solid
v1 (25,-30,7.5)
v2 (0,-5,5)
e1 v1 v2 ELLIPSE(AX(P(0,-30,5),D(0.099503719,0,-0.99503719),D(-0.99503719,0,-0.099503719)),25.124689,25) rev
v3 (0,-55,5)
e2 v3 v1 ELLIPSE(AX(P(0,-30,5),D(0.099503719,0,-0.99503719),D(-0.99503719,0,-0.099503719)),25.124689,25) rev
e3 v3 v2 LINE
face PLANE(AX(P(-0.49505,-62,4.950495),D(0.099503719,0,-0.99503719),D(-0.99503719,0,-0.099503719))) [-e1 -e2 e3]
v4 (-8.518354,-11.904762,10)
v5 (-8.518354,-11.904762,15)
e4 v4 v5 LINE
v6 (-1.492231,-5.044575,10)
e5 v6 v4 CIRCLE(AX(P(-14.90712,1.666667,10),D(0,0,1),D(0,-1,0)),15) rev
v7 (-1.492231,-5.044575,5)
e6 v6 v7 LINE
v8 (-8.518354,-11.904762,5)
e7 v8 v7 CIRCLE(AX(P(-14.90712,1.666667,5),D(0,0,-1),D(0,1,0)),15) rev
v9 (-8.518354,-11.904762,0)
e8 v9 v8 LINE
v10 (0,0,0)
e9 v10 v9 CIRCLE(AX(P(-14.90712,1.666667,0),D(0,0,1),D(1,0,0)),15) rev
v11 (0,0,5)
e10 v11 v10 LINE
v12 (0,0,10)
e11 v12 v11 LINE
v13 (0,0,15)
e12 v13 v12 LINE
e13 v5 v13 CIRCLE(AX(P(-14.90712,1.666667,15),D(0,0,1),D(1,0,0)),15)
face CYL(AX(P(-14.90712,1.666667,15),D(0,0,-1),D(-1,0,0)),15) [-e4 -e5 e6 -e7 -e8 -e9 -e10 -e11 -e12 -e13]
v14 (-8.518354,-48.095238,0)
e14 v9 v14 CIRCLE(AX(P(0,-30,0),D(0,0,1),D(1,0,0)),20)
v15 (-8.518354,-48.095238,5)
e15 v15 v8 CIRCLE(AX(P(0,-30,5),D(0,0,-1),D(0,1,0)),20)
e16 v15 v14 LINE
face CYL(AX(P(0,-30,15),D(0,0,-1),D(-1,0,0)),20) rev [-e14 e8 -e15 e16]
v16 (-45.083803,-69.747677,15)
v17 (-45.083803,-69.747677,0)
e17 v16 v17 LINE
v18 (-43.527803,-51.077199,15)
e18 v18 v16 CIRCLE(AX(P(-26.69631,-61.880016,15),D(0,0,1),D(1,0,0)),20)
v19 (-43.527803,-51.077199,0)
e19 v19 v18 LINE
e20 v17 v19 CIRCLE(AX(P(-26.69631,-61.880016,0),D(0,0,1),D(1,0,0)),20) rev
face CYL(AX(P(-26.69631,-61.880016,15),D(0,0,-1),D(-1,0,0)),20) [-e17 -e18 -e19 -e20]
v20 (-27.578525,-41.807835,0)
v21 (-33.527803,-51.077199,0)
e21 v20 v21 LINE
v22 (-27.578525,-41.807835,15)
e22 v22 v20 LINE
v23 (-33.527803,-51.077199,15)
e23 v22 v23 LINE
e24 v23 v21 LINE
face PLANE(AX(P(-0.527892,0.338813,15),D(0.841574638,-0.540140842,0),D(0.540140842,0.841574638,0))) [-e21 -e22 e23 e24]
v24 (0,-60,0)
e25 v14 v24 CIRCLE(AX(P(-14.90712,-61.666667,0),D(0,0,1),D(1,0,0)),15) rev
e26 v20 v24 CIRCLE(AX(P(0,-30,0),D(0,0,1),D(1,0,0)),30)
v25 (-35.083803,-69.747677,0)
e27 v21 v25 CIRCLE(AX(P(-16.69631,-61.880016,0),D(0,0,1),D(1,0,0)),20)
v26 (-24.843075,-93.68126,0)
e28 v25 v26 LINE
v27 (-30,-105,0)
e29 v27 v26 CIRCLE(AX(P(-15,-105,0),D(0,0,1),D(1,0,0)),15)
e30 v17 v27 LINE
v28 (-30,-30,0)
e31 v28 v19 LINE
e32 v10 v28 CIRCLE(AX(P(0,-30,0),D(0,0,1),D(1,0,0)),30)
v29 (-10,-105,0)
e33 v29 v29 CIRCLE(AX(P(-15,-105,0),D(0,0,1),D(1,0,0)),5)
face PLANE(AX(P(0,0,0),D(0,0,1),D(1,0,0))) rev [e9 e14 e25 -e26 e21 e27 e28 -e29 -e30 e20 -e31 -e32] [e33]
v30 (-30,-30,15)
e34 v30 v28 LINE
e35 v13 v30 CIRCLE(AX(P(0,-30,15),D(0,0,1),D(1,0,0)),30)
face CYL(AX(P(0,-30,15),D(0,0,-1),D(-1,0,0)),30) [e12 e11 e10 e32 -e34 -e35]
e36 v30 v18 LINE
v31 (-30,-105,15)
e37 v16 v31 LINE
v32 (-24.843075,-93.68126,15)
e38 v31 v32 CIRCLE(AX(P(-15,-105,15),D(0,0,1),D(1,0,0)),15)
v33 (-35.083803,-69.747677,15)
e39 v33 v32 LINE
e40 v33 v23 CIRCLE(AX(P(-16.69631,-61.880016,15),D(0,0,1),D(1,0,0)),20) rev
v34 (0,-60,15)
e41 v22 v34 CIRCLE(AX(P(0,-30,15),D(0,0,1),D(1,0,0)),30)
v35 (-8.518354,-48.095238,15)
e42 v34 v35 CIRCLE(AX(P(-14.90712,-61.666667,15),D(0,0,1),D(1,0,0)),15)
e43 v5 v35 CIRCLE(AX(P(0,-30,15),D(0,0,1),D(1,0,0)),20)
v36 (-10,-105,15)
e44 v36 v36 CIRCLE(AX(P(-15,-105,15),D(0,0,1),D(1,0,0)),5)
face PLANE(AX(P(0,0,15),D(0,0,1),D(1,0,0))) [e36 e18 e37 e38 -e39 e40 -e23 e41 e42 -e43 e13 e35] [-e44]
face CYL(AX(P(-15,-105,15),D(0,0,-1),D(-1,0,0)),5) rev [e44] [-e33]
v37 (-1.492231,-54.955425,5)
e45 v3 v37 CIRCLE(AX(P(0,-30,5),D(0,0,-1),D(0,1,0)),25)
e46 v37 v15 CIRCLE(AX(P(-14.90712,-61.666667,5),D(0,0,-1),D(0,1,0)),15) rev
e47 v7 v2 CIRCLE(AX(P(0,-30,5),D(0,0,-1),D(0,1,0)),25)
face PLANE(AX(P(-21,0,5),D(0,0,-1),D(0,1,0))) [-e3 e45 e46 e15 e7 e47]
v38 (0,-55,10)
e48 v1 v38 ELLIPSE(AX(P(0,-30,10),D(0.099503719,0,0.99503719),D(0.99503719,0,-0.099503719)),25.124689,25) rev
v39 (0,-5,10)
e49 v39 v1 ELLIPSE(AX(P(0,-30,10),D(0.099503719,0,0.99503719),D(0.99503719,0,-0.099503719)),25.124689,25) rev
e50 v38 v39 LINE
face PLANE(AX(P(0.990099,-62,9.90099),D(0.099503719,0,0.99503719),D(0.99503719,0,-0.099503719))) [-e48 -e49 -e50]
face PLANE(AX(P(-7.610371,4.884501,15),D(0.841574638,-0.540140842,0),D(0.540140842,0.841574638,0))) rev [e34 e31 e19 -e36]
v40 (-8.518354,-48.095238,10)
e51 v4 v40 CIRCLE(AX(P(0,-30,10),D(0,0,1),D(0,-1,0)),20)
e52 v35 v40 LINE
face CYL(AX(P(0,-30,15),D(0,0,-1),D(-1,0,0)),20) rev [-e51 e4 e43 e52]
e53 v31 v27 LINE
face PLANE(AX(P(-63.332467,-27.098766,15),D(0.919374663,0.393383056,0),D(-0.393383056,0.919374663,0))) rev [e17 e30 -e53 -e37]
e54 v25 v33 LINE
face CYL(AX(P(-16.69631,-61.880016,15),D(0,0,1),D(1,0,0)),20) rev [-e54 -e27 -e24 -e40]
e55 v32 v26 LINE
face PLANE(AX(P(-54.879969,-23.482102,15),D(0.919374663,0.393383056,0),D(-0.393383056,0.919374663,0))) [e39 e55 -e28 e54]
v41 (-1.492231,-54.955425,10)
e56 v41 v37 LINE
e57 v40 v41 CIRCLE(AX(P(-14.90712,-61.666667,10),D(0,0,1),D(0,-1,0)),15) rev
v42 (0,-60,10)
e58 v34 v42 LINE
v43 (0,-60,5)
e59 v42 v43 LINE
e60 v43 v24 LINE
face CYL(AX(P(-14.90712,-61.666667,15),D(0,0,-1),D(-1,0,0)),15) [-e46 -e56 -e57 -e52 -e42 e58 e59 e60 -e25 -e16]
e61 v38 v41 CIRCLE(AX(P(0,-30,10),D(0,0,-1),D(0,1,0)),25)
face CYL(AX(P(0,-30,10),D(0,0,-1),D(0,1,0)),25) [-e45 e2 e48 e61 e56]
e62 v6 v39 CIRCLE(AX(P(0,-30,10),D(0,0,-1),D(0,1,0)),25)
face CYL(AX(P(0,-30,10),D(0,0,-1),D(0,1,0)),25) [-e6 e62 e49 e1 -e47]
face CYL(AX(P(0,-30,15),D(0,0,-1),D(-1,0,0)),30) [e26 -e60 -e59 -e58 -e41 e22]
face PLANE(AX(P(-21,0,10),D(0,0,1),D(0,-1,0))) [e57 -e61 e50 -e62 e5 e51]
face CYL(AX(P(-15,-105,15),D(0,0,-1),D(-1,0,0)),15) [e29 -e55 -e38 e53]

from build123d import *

# Parameters (mm, degrees)
BOSS_EXTRUDE1_DEPTH      = 15
FILLET1_R                = 20
FILLET2_R                = 15
BOSS_EXTRUDE2_DEPTH      = 25
BOSS_EXTRUDE2_DEPTH_BACK = 21
SKETCH2_W                = 5
SKETCH2_H                = 60
CUT_EXTRUDE1_DEPTH       = 5
CUT_EXTRUDE2_DEPTH       = 62


with BuildPart() as part:
    # Sketch1 → Boss-Extrude1 (new body)
    # profile 1 of 6: a face of its own
    with BuildSketch(Plane.XY):
        with BuildLine():
            Line((-20, -30), (-30, -30))
            ThreePointArc((-30, -30), (-29.388396861, -36.026784376), (-27.578524672, -41.807835403))
            Line((-27.578524672, -41.807835403), (-20, -30))
        make_face()
    # profile 2 of 6: a face of its own
    with BuildSketch(Plane.XY):
        with BuildLine():
            Line((0, -10), (0, 0))
            ThreePointArc((0, 0), (-21.213203436, -8.786796564), (-30, -30))
            Line((-30, -30), (-20, -30))
            ThreePointArc((-20, -30), (-14.142135624, -15.857864376), (0, -10))
        make_face()
    # profile 3 of 6: a face of its own
    with BuildSketch(Plane.XY):
        with BuildLine():
            ThreePointArc((0, -50), (-14.142135624, -44.142135624), (-20, -30))
            Line((-20, -30), (-27.578524672, -41.807835403))
            ThreePointArc((-27.578524672, -41.807835403), (-16.519154608, -55.04231481), (0, -60))
            Line((0, -60), (0, -50))
        make_face()
    # profile 4 of 6: a face of its own
    with BuildSketch(Plane.XY):
        with BuildLine():
            ThreePointArc((-27.578524672, -41.807835403), (-29.388396861, -36.026784376), (-30, -30))
            Line((-30, -30), (-49.254650189, -60))
            Line((-49.254650189, -60), (-30, -105))
            ThreePointArc((-30, -105), (-28.650020621, -98.780921528), (-24.84307506, -93.681260081))
            Line((-24.84307506, -93.681260081), (-39.254650189, -60))
            Line((-39.254650189, -60), (-27.578524672, -41.807835403))
        make_face()
    # profile 5 of 6: a face of its own
    with BuildSketch(Plane.XY):
        with BuildLine():
            ThreePointArc((-24.84307506, -93.681260081), (-28.650020621, -98.780921528), (-30, -105))
            Line((-30, -105), (-20, -105))
            Line((-20, -105), (-24.84307506, -93.681260081))
        make_face()
    # profile 6 of 6: a face of its own
    with BuildSketch(Plane.XY):
        with BuildLine():
            Line((-20, -105), (-30, -105))
            ThreePointArc((-30, -105), (-15, -120), (0, -105))
            ThreePointArc((0, -105), (-8.780921528, -91.349979379), (-24.84307506, -93.681260081))
            Line((-24.84307506, -93.681260081), (-20, -105))
        make_face()
        with BuildLine():
            ThreePointArc((-10, -105), (-15, -110), (-20, -105))
            ThreePointArc((-20, -105), (-15, -100), (-10, -105))
        make_face(mode=Mode.SUBTRACT)
    extrude(amount=BOSS_EXTRUDE1_DEPTH)

    # Fillet1
    fillet1_edges = [part.edges().sort_by_distance(p)[0] for p in [
        (-39.254650189, -60, 7.5),
        (-49.254650189, -60, 7.5),
    ]]
    fillet(fillet1_edges, radius=FILLET1_R)

    # Fillet2
    # the kernel refuses this fillet: 15 mm, written as the material it takes off along each edge
    with BuildSketch(Plane(origin=(0, -50, -25), x_dir=(-0.9759000729485309, 0.21821789023600283, 0), z_dir=(0, 0, 1))) as fillet2_piece_1:
        with BuildLine():
            CenterArc((12.001983963, 14.638501094), FILLET2_R, 198.983752857, 58.411864495)
            Line((-2.182178902, 9.759000729), (-2.46586216, 9.661410722))
            ThreePointArc((-2.46586216, 9.661410722), (-1.383859473, 4.814034998), (-0.292770022, -0.065465367))
            Line((-0.292770022, -0.065465367), (0.065465367, -0.292770022))
            ThreePointArc((0.065465367, -0.292770022), (4.364357805, 0.181998541), (8.663250242, -0.292770022))
            Line((8.663250242, -0.292770022), (8.728715609, 0))
        make_face()
    extrude(amount=65, mode=Mode.SUBTRACT)
    with BuildSketch(Plane(origin=(0, -10, -25), x_dir=(0, 1, 0), z_dir=(0, 0, 1))) as fillet2_piece_2:
        with BuildLine():
            CenterArc((11.666666667, 14.90711985), FILLET2_R, 205.208765297, 58.411864495)
            Line((-1.904761905, 8.5183542), (-2.176190476, 8.390578887))
            ThreePointArc((-2.176190476, 8.390578887), (-0.774768563, 4.298892438), (-0.3, 0))
            Line((-0.3, 0), (0, -0.3))
            ThreePointArc((0, -0.3), (5, -0.3), (9.966666667, -0.298142397))
            Line((9.966666667, -0.298142397), (10, 0))
        make_face()
    extrude(amount=65, mode=Mode.SUBTRACT)

    # Sketch2 → Boss-Extrude2 (add, two sides: drawn at the far end of the back side and taken through both)
    with BuildSketch(Plane(origin=(0, 0, 0), x_dir=(0, 0, -1), z_dir=(1, 0, 0)).offset(-BOSS_EXTRUDE2_DEPTH_BACK)):
        with Locations((-7.5, -30)):
            Rectangle(SKETCH2_W, SKETCH2_H)
    extrude(amount=BOSS_EXTRUDE2_DEPTH + BOSS_EXTRUDE2_DEPTH_BACK)

    # Sketch3 → Cut-Extrude1 (cut)
    with BuildSketch(Plane(origin=(0, 0, 5), x_dir=(-1, 0, 0), z_dir=(0, 0, -1))):
        with BuildLine():
            Line((0, 0), (-25, 0))
            Line((-25, 0), (-25, -30.000000042))
            ThreePointArc((-25, -30.000000042), (-17.141969276, -11.802393307), (1.49223119, -5.044574817))
            ThreePointArc((1.49223119, -5.044574817), (0.523240843, -2.588215791), (0, 0))
        make_face()
        with BuildLine():
            Line((21, 0), (0, 0))
            ThreePointArc((0, 0), (11.341768853, -2.226554422), (21, -8.575714714))
            Line((21, -8.575714714), (21, 0))
        make_face()
        with BuildLine():
            ThreePointArc((1.49223119, -54.955425183), (-17.141969245, -48.197606722), (-25, -30.000000042))
            Line((-25, -30.000000042), (-25, -60))
            Line((-25, -60), (0, -60))
            ThreePointArc((0, -60), (0.523240843, -57.411784209), (1.49223119, -54.955425183))
        make_face()
        with BuildLine():
            ThreePointArc((21, -51.424285286), (11.341768853, -57.773445578), (0, -60))
            Line((0, -60), (21, -60))
            Line((21, -60), (21, -51.424285286))
        make_face()
    extrude(amount=-CUT_EXTRUDE1_DEPTH, mode=Mode.SUBTRACT)

    # Sketch4 → Cut-Extrude2 (cut)
    with BuildSketch(Plane(origin=(0, 0, 0), x_dir=(1, 0, 0), z_dir=(0, 1, 0))):
        Polygon((0, -5), (25, -7.5), (25, -5), align=None)
        Polygon((25, -10), (25, -7.5), (0, -10), align=None)
    extrude(amount=-CUT_EXTRUDE2_DEPTH, mode=Mode.SUBTRACT)


solid = part.part
